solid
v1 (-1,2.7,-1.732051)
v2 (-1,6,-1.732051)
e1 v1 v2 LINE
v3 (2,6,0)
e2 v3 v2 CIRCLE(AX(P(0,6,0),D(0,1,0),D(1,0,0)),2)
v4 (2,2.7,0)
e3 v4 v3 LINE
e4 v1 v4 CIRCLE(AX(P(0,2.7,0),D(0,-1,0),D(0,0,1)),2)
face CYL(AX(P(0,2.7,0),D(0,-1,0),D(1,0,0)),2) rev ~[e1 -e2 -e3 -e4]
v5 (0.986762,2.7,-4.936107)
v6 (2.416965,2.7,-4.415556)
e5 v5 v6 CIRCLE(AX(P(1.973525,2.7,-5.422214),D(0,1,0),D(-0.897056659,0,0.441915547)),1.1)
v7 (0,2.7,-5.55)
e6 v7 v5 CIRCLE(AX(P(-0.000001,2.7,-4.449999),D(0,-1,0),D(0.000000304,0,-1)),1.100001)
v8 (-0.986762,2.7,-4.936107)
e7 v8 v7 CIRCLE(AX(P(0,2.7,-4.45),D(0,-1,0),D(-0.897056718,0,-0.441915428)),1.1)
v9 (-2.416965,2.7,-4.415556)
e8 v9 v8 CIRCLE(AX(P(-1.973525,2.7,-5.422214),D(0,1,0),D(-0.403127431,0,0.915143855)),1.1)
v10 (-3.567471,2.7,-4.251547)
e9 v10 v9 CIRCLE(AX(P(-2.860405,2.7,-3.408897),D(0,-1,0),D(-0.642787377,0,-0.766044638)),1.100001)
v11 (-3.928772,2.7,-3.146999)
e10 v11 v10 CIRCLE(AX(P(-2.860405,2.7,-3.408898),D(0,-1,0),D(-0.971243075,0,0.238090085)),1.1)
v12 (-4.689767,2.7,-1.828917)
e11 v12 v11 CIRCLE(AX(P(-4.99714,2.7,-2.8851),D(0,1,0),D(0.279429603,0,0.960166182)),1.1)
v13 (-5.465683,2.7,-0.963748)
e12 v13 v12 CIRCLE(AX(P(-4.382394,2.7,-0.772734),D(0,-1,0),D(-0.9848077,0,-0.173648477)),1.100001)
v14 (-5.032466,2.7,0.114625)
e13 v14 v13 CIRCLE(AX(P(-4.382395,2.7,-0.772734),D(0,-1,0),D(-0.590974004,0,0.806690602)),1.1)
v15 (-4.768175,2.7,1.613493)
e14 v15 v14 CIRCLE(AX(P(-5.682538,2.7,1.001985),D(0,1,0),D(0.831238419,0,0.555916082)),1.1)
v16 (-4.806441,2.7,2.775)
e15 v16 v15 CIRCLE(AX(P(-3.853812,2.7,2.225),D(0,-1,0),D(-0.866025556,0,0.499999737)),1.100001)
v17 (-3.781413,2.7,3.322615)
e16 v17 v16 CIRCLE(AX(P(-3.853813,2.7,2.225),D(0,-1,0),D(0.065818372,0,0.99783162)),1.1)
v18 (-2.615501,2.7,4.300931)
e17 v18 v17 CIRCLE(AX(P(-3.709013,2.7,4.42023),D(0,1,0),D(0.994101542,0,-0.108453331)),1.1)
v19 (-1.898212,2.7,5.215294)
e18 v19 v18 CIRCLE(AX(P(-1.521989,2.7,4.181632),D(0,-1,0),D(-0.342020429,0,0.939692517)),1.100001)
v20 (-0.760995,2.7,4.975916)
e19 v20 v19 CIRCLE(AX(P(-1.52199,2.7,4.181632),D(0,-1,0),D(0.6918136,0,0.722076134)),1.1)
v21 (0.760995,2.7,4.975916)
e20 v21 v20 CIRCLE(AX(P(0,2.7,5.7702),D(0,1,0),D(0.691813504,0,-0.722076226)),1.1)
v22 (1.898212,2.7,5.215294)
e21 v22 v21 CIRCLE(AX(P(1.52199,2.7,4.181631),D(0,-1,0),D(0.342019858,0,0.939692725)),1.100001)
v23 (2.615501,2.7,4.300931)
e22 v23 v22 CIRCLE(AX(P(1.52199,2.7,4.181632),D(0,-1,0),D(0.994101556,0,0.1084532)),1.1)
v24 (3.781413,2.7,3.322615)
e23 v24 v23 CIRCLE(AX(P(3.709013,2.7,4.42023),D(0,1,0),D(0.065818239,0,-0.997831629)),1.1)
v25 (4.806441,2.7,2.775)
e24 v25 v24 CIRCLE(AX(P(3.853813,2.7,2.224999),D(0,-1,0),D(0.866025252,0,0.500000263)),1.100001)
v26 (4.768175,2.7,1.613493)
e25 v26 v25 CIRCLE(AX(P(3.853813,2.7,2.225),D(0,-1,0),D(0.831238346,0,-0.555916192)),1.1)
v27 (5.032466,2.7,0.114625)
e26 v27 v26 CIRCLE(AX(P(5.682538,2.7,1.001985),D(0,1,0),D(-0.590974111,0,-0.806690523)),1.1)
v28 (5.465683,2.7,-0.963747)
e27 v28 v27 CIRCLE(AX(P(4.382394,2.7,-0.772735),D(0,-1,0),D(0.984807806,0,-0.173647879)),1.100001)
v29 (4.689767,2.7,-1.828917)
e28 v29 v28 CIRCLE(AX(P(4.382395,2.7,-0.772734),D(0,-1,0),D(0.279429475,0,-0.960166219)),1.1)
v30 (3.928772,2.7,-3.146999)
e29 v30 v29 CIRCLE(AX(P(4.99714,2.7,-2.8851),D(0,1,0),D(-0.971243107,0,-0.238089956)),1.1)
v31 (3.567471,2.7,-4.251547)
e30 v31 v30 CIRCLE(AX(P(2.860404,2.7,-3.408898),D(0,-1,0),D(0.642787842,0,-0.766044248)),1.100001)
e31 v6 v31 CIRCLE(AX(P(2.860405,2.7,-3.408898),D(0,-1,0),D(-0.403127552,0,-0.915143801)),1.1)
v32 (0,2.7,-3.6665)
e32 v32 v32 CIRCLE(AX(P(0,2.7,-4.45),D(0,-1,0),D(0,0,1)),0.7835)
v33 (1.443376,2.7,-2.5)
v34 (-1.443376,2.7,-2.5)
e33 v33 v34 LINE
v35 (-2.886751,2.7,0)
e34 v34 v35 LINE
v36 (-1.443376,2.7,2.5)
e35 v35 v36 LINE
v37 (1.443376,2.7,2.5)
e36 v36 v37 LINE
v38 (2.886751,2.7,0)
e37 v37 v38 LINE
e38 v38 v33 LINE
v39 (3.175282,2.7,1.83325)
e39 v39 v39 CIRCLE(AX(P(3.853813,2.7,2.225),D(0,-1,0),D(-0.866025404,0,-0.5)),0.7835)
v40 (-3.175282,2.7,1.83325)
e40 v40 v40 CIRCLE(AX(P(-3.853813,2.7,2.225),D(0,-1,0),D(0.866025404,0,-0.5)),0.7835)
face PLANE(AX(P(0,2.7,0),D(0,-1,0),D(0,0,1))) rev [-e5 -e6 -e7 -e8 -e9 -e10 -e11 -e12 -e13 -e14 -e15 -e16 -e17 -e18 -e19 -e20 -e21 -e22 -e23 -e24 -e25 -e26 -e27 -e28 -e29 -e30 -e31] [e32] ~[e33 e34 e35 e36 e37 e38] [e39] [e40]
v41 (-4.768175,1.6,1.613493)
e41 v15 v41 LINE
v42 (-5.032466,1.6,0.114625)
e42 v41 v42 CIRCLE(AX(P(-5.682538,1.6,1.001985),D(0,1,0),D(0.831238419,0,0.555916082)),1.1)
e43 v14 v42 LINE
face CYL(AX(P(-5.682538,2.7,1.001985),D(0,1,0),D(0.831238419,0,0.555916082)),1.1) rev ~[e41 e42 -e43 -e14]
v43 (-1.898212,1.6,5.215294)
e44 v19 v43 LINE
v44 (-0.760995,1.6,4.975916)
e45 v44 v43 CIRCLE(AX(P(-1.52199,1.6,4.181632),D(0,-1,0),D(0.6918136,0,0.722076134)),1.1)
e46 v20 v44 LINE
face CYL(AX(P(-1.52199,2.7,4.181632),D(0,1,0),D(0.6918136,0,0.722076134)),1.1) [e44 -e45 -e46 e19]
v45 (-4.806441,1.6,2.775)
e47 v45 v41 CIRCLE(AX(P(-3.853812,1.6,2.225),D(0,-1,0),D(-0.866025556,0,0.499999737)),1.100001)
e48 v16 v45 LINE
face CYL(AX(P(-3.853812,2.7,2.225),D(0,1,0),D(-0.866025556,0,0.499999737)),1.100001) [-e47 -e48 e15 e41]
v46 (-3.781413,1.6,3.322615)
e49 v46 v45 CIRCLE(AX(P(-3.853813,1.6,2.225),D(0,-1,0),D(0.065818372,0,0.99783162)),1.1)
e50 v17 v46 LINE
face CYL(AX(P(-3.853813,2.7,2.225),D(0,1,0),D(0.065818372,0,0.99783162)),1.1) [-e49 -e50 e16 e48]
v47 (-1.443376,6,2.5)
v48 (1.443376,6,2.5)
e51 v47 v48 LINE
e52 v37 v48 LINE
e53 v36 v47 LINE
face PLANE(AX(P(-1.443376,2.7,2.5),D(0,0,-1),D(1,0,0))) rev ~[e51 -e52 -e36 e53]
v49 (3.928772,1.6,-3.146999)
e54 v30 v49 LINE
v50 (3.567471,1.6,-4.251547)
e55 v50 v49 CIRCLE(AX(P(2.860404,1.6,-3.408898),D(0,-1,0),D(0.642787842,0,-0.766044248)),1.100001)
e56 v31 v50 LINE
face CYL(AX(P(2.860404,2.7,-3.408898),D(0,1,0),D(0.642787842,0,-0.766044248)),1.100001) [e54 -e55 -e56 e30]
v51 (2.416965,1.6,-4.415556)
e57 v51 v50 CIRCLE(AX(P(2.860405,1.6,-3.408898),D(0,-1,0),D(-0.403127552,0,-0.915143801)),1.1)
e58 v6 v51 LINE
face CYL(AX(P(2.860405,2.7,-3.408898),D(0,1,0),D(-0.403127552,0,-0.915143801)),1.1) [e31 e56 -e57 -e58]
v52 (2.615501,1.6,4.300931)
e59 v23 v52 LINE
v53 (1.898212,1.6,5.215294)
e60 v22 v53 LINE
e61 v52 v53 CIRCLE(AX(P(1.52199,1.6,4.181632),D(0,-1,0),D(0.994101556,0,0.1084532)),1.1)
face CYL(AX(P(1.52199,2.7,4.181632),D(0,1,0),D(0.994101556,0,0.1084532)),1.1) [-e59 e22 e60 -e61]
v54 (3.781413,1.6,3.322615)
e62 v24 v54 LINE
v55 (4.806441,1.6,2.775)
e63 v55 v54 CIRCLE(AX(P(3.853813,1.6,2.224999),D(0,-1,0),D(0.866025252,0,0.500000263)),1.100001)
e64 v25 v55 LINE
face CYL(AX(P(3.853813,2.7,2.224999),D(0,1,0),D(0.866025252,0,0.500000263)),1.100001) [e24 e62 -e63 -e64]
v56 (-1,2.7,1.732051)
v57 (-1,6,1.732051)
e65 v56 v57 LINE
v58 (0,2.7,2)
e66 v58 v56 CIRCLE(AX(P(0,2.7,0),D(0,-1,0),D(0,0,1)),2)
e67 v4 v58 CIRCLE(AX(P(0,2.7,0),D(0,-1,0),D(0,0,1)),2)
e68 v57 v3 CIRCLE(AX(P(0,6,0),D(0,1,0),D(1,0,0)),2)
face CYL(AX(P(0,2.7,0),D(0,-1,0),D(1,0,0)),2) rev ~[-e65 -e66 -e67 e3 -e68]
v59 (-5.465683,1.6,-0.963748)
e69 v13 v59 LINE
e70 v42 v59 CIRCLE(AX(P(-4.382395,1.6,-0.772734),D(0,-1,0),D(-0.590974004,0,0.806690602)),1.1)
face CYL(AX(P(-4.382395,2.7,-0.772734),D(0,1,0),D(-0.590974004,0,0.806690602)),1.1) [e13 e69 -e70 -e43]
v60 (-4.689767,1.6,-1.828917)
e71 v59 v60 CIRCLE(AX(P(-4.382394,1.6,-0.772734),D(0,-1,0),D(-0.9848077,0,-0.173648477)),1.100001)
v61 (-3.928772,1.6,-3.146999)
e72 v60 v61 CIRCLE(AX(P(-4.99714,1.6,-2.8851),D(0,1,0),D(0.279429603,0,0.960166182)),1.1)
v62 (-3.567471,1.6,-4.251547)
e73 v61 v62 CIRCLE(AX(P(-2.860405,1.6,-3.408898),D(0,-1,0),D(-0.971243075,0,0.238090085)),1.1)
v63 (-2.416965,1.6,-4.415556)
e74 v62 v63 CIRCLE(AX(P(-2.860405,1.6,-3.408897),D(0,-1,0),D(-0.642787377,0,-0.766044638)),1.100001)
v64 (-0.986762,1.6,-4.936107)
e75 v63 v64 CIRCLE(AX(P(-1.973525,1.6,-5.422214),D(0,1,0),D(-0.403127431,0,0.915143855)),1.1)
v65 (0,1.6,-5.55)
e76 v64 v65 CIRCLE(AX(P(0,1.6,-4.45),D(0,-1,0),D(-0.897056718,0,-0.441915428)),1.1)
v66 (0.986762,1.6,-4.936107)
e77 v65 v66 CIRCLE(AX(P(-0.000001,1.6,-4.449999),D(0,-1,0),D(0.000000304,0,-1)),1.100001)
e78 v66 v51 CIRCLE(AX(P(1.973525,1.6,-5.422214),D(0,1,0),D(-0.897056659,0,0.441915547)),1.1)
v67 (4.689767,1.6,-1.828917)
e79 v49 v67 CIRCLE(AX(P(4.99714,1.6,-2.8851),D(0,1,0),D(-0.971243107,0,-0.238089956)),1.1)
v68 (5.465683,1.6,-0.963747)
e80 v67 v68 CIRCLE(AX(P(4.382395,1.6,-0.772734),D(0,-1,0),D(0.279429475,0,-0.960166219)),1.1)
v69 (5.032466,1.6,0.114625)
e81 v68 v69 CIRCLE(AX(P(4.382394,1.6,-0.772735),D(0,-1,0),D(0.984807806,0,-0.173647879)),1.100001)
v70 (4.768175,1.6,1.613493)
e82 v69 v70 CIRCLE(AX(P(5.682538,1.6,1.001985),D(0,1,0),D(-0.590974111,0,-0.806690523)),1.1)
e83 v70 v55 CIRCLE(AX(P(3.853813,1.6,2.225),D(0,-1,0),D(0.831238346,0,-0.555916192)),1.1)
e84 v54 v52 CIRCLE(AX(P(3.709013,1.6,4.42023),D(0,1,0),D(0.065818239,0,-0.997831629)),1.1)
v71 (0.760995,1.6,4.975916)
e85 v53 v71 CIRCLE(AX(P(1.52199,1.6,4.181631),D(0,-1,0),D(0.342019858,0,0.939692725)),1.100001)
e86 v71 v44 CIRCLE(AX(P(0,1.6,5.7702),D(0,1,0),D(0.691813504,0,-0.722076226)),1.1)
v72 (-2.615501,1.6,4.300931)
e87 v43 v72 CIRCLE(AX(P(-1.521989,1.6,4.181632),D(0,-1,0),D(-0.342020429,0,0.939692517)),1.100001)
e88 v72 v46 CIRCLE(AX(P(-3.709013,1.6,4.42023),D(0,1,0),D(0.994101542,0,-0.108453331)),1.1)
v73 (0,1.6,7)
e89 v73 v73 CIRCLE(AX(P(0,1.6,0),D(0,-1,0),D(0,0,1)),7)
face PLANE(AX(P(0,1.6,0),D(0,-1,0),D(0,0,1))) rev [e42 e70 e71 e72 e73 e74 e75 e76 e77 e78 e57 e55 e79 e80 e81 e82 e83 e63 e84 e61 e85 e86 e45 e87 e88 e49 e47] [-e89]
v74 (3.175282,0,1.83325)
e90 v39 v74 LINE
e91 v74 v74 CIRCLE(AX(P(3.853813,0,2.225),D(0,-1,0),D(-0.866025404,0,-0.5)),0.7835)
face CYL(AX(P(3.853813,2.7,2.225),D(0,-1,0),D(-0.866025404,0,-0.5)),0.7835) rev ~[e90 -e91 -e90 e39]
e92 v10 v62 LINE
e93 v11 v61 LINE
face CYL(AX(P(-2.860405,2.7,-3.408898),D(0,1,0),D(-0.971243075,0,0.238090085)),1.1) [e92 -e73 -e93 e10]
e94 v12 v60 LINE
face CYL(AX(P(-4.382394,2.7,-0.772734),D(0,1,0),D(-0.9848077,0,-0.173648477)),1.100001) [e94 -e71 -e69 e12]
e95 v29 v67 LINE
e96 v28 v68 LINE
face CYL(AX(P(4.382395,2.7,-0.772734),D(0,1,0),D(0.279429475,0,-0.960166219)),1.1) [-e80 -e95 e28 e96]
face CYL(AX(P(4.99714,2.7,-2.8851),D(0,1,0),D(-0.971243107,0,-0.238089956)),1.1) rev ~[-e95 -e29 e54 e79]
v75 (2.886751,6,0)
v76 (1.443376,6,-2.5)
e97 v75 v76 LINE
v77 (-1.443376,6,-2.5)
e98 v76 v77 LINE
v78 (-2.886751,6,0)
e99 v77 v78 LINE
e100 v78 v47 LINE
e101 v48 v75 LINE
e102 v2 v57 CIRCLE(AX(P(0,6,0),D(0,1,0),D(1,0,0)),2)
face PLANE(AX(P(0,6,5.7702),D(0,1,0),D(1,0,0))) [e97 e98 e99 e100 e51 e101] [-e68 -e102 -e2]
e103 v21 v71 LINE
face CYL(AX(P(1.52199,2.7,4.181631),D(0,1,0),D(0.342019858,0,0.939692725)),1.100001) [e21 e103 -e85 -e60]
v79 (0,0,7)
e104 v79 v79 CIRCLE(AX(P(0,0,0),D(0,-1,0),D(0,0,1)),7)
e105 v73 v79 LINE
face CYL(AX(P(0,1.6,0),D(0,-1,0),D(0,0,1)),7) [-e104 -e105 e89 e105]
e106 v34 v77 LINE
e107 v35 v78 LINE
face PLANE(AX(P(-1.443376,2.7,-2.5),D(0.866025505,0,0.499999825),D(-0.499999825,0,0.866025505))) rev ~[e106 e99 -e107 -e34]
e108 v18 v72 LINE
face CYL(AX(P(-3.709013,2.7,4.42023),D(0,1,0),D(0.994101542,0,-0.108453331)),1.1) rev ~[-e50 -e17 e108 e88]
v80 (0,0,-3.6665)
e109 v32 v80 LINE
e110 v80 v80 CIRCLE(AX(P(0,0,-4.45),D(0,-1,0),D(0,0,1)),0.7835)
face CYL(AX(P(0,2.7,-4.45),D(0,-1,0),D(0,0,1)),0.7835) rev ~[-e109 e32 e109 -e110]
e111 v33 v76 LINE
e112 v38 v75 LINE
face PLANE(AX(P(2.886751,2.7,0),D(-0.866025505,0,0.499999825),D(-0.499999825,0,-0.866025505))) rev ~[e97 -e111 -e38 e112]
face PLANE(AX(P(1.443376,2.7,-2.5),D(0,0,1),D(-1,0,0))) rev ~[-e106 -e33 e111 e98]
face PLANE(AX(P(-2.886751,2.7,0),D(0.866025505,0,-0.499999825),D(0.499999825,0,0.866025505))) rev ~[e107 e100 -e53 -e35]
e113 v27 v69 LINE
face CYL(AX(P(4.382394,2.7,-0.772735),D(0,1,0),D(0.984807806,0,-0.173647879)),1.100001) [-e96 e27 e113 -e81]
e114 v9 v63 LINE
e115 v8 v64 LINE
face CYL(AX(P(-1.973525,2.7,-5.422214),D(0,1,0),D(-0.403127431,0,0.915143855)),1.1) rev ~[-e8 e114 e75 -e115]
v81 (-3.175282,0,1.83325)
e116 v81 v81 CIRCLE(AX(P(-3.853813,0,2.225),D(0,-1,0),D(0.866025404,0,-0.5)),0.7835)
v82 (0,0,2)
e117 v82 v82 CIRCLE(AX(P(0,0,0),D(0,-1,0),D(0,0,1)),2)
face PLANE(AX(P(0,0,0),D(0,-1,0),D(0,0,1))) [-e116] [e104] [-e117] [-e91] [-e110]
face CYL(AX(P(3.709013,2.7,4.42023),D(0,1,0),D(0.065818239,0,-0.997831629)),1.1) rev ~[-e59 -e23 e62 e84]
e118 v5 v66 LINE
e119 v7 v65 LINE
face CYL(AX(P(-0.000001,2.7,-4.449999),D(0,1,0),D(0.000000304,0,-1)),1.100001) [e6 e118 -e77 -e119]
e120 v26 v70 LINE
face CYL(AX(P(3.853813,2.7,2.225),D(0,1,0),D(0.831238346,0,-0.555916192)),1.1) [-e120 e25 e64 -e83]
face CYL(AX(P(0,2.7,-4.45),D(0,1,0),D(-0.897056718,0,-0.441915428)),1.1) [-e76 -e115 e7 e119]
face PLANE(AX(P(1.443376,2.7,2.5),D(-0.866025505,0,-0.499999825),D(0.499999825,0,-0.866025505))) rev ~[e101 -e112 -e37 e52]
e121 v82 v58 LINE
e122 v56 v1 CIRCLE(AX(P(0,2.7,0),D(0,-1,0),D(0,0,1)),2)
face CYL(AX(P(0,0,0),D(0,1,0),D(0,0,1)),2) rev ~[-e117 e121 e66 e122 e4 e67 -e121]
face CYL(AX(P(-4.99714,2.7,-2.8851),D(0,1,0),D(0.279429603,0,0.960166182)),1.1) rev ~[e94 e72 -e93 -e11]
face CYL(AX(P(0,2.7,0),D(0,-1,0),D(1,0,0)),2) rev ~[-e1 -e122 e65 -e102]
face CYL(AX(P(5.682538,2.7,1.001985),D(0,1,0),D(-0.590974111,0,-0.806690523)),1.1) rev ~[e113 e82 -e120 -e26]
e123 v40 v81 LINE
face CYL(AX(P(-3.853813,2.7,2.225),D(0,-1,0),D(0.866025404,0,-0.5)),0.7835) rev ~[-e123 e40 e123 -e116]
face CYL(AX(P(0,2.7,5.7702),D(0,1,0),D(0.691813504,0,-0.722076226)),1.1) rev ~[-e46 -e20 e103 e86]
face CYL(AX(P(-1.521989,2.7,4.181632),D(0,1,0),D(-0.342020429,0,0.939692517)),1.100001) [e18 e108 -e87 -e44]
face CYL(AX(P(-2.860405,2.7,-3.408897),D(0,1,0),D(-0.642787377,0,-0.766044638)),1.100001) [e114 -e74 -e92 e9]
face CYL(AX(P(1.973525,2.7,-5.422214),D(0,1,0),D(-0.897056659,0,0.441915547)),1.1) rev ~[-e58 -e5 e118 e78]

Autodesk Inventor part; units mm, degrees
ref_plane "YZ Plane" through (0, 0, 0) normal (1, 0, 0) x (0, 1, 0)
ref_plane "XZ Plane" through (0, 0, 0) normal (0, 1, 0) x (-1, 0, 0)
ref_plane "XY Plane" through (0, 0, 0) normal (0, 0, 1) x (1, 0, 0)
sketch "Skizze3" plane through (0, 0, 0) normal (1, 0, 0) x (0, 1, 0)
  line L0 (9.15, 0) -> (0, 0)
  line L1 (1.6, 5.55) -> (2.7, 5.55)
  line L2 (2.7, 5.55) -> (2.7, 2)
  line L3 (2.7, 2) -> (0, 2)
  line L4 (0, 2) -> (0, 7)
  line L5 (0, 7) -> (1.6, 7)
  line L6 (1.6, 7) -> (1.6, 5.55)
  dimension "d17" = 4
  dimension "d18" = 11.1
  dimension "d24" = 14
  dimension "d69" = 1.6
  dimension "d75" = 1.1
sketch "Skizze3 outline for Umdrehung1" plane through (0, 0, 0) normal (1, 0, 0) x (0, 1, 0)
  line L0 (1.6, 7) -> (0, 7)
  line L1 (1.6, 5.55) -> (1.6, 7)
  line L2 (2.7, 5.55) -> (1.6, 5.55)
  line L3 (2.7, 2) -> (2.7, 5.55)
  line L4 (0, 2) -> (2.7, 2)
  line L5 (0, 7) -> (0, 2)
revolve "Umdrehung1" add sketch "Skizze3 outline for Umdrehung1" angle 360 about axis through (0, 9.15, 0) along (0, -1, 0)
sketch "Skizze8" plane through (0, 2.7, 0) normal (0, 1, 0) x (1, 0, 0)
  circle A0 centre (0, 0) radius 5.55
  arc A1 (0.760995, -4.975916) -> (1.898212, -5.215294) centre (1.52199, -4.181632) ccw
  arc A2 (0.760995, -4.975916) -> (-0.760995, -4.975916) centre (0, -5.7702) ccw
  arc A3 (-1.898212, -5.215294) -> (-0.760995, -4.975916) centre (-1.52199, -4.181632) ccw
  line L0 (0, 9.8) -> (0, -9.8) construction
  line L1 (-1.898212, -5.215294) -> (0, 0) construction
  dimension "d59" = 1.1
  dimension "d60" = 1.1
  dimension "d61" = 20
sketch "Skizze8 outline for Extrusion5" plane through (0, 2.7, 0) normal (0, 1, 0) x (1, 0, 0)
  arc A0 (0.760995, -4.975916) -> (-0.760995, -4.975916) centre (0, -5.7702) ccw
  arc A1 (1.898212, -5.215294) -> (0.760995, -4.975916) centre (1.52199, -4.181632) cw
  arc A2 (-1.898212, -5.215294) -> (1.898212, -5.215294) centre (0, 0) ccw
  arc A3 (-0.760995, -4.975916) -> (-1.898212, -5.215294) centre (-1.52199, -4.181632) cw
extrude "Extrusion5" cut sketch "Skizze8 outline for Extrusion5" against normal up to surface (1.1 mm away)
pattern_circular "Runde Anordnung2" count 9 over 360 about axis through (0, -10, 0) along (0, 1, 0) of "Extrusion5"
sketch "Skizze9" plane through (0, 2.7, 5.7702) normal (0, 1, 0) x (1, 0, 0)
  circle A0 centre (0, 5.7702) radius 3 construction
  line L0 (0, 15.5702) -> (0, -4.0298) construction
  circle A1 centre (0, 5.7702) radius 2
  line L1 (-1.443376, 3.2702) -> (-2.886751, 5.7702)
  line L2 (-2.886751, 5.7702) -> (-1.443376, 8.2702)
  line L3 (-1.443376, 8.2702) -> (1.443376, 8.2702)
  line L4 (1.443376, 8.2702) -> (2.886751, 5.7702)
  line L5 (2.886751, 5.7702) -> (1.443376, 3.2702)
  line L6 (1.443376, 3.2702) -> (-1.443376, 3.2702)
  circle A2 centre (0, 10.2202) radius 1 construction
  arc A3 (0.986762, 10.706307) -> (-0.986762, 10.706307) centre (0, 10.2202) ccw construction
  line L7 (1.443376, 3.2702) -> (0, 5.7702)
  line L8 (0, 5.7702) -> (-1.443376, 3.2702)
  line L9 (1, 4.038149) -> (1, 3.2702)
  line L10 (-1, 4.038149) -> (-1, 3.2702)
  line L11 (1.443376, 3.2702) -> (1.443376, 4.385763)
  line L12 (-1.443376, 3.2702) -> (-1.443376, 4.385763)
  point P0 (0, 7.7702)
  point P1 (0, 11.2202)
  point P2 (1, 4.038149)
  point P3 (-1, 4.038149)
  dimension "d92" = 2
  dimension "d70" = 6
  dimension "d74" = 4
  dimension "d89" = 0.5
  dimension "d90" = 5
  dimension "d91" = 4.45
sketch "Skizze9 outline for Extrusion6" plane through (0, 2.7, 5.7702) normal (0, 1, 0) x (1, 0, 0)
  circle A0 centre (0, 5.7702) radius 2
  line L0 (1.443376, 3.2702) -> (2.886751, 5.7702)
  line L1 (2.886751, 5.7702) -> (1.443376, 8.2702)
  line L2 (1.443376, 8.2702) -> (-1.443376, 8.2702)
  line L3 (-1.443376, 8.2702) -> (-2.886751, 5.7702)
  line L4 (-2.886751, 5.7702) -> (-1.443376, 3.2702)
  line L5 (-1.443376, 3.2702) -> (1.443376, 3.2702)
extrude "Extrusion6" add sketch "Skizze9 outline for Extrusion6" along normal blind 3.3
hole "Bohrung3" at (0, 2.7, -4.45) direction (0, -1, 0) diameter 1.567 end through all thread size "M2x0.4" class "6H" standard "ISO Metric profile"
pattern_circular "Runde Anordnung3" count 3 over 360 about axis through (0, -10, 0) along (0, 1, 0) of "Bohrung3", "Extrusion6"
properties part number "Encoder Klemmscheibe" material "Aluminium 6061"
